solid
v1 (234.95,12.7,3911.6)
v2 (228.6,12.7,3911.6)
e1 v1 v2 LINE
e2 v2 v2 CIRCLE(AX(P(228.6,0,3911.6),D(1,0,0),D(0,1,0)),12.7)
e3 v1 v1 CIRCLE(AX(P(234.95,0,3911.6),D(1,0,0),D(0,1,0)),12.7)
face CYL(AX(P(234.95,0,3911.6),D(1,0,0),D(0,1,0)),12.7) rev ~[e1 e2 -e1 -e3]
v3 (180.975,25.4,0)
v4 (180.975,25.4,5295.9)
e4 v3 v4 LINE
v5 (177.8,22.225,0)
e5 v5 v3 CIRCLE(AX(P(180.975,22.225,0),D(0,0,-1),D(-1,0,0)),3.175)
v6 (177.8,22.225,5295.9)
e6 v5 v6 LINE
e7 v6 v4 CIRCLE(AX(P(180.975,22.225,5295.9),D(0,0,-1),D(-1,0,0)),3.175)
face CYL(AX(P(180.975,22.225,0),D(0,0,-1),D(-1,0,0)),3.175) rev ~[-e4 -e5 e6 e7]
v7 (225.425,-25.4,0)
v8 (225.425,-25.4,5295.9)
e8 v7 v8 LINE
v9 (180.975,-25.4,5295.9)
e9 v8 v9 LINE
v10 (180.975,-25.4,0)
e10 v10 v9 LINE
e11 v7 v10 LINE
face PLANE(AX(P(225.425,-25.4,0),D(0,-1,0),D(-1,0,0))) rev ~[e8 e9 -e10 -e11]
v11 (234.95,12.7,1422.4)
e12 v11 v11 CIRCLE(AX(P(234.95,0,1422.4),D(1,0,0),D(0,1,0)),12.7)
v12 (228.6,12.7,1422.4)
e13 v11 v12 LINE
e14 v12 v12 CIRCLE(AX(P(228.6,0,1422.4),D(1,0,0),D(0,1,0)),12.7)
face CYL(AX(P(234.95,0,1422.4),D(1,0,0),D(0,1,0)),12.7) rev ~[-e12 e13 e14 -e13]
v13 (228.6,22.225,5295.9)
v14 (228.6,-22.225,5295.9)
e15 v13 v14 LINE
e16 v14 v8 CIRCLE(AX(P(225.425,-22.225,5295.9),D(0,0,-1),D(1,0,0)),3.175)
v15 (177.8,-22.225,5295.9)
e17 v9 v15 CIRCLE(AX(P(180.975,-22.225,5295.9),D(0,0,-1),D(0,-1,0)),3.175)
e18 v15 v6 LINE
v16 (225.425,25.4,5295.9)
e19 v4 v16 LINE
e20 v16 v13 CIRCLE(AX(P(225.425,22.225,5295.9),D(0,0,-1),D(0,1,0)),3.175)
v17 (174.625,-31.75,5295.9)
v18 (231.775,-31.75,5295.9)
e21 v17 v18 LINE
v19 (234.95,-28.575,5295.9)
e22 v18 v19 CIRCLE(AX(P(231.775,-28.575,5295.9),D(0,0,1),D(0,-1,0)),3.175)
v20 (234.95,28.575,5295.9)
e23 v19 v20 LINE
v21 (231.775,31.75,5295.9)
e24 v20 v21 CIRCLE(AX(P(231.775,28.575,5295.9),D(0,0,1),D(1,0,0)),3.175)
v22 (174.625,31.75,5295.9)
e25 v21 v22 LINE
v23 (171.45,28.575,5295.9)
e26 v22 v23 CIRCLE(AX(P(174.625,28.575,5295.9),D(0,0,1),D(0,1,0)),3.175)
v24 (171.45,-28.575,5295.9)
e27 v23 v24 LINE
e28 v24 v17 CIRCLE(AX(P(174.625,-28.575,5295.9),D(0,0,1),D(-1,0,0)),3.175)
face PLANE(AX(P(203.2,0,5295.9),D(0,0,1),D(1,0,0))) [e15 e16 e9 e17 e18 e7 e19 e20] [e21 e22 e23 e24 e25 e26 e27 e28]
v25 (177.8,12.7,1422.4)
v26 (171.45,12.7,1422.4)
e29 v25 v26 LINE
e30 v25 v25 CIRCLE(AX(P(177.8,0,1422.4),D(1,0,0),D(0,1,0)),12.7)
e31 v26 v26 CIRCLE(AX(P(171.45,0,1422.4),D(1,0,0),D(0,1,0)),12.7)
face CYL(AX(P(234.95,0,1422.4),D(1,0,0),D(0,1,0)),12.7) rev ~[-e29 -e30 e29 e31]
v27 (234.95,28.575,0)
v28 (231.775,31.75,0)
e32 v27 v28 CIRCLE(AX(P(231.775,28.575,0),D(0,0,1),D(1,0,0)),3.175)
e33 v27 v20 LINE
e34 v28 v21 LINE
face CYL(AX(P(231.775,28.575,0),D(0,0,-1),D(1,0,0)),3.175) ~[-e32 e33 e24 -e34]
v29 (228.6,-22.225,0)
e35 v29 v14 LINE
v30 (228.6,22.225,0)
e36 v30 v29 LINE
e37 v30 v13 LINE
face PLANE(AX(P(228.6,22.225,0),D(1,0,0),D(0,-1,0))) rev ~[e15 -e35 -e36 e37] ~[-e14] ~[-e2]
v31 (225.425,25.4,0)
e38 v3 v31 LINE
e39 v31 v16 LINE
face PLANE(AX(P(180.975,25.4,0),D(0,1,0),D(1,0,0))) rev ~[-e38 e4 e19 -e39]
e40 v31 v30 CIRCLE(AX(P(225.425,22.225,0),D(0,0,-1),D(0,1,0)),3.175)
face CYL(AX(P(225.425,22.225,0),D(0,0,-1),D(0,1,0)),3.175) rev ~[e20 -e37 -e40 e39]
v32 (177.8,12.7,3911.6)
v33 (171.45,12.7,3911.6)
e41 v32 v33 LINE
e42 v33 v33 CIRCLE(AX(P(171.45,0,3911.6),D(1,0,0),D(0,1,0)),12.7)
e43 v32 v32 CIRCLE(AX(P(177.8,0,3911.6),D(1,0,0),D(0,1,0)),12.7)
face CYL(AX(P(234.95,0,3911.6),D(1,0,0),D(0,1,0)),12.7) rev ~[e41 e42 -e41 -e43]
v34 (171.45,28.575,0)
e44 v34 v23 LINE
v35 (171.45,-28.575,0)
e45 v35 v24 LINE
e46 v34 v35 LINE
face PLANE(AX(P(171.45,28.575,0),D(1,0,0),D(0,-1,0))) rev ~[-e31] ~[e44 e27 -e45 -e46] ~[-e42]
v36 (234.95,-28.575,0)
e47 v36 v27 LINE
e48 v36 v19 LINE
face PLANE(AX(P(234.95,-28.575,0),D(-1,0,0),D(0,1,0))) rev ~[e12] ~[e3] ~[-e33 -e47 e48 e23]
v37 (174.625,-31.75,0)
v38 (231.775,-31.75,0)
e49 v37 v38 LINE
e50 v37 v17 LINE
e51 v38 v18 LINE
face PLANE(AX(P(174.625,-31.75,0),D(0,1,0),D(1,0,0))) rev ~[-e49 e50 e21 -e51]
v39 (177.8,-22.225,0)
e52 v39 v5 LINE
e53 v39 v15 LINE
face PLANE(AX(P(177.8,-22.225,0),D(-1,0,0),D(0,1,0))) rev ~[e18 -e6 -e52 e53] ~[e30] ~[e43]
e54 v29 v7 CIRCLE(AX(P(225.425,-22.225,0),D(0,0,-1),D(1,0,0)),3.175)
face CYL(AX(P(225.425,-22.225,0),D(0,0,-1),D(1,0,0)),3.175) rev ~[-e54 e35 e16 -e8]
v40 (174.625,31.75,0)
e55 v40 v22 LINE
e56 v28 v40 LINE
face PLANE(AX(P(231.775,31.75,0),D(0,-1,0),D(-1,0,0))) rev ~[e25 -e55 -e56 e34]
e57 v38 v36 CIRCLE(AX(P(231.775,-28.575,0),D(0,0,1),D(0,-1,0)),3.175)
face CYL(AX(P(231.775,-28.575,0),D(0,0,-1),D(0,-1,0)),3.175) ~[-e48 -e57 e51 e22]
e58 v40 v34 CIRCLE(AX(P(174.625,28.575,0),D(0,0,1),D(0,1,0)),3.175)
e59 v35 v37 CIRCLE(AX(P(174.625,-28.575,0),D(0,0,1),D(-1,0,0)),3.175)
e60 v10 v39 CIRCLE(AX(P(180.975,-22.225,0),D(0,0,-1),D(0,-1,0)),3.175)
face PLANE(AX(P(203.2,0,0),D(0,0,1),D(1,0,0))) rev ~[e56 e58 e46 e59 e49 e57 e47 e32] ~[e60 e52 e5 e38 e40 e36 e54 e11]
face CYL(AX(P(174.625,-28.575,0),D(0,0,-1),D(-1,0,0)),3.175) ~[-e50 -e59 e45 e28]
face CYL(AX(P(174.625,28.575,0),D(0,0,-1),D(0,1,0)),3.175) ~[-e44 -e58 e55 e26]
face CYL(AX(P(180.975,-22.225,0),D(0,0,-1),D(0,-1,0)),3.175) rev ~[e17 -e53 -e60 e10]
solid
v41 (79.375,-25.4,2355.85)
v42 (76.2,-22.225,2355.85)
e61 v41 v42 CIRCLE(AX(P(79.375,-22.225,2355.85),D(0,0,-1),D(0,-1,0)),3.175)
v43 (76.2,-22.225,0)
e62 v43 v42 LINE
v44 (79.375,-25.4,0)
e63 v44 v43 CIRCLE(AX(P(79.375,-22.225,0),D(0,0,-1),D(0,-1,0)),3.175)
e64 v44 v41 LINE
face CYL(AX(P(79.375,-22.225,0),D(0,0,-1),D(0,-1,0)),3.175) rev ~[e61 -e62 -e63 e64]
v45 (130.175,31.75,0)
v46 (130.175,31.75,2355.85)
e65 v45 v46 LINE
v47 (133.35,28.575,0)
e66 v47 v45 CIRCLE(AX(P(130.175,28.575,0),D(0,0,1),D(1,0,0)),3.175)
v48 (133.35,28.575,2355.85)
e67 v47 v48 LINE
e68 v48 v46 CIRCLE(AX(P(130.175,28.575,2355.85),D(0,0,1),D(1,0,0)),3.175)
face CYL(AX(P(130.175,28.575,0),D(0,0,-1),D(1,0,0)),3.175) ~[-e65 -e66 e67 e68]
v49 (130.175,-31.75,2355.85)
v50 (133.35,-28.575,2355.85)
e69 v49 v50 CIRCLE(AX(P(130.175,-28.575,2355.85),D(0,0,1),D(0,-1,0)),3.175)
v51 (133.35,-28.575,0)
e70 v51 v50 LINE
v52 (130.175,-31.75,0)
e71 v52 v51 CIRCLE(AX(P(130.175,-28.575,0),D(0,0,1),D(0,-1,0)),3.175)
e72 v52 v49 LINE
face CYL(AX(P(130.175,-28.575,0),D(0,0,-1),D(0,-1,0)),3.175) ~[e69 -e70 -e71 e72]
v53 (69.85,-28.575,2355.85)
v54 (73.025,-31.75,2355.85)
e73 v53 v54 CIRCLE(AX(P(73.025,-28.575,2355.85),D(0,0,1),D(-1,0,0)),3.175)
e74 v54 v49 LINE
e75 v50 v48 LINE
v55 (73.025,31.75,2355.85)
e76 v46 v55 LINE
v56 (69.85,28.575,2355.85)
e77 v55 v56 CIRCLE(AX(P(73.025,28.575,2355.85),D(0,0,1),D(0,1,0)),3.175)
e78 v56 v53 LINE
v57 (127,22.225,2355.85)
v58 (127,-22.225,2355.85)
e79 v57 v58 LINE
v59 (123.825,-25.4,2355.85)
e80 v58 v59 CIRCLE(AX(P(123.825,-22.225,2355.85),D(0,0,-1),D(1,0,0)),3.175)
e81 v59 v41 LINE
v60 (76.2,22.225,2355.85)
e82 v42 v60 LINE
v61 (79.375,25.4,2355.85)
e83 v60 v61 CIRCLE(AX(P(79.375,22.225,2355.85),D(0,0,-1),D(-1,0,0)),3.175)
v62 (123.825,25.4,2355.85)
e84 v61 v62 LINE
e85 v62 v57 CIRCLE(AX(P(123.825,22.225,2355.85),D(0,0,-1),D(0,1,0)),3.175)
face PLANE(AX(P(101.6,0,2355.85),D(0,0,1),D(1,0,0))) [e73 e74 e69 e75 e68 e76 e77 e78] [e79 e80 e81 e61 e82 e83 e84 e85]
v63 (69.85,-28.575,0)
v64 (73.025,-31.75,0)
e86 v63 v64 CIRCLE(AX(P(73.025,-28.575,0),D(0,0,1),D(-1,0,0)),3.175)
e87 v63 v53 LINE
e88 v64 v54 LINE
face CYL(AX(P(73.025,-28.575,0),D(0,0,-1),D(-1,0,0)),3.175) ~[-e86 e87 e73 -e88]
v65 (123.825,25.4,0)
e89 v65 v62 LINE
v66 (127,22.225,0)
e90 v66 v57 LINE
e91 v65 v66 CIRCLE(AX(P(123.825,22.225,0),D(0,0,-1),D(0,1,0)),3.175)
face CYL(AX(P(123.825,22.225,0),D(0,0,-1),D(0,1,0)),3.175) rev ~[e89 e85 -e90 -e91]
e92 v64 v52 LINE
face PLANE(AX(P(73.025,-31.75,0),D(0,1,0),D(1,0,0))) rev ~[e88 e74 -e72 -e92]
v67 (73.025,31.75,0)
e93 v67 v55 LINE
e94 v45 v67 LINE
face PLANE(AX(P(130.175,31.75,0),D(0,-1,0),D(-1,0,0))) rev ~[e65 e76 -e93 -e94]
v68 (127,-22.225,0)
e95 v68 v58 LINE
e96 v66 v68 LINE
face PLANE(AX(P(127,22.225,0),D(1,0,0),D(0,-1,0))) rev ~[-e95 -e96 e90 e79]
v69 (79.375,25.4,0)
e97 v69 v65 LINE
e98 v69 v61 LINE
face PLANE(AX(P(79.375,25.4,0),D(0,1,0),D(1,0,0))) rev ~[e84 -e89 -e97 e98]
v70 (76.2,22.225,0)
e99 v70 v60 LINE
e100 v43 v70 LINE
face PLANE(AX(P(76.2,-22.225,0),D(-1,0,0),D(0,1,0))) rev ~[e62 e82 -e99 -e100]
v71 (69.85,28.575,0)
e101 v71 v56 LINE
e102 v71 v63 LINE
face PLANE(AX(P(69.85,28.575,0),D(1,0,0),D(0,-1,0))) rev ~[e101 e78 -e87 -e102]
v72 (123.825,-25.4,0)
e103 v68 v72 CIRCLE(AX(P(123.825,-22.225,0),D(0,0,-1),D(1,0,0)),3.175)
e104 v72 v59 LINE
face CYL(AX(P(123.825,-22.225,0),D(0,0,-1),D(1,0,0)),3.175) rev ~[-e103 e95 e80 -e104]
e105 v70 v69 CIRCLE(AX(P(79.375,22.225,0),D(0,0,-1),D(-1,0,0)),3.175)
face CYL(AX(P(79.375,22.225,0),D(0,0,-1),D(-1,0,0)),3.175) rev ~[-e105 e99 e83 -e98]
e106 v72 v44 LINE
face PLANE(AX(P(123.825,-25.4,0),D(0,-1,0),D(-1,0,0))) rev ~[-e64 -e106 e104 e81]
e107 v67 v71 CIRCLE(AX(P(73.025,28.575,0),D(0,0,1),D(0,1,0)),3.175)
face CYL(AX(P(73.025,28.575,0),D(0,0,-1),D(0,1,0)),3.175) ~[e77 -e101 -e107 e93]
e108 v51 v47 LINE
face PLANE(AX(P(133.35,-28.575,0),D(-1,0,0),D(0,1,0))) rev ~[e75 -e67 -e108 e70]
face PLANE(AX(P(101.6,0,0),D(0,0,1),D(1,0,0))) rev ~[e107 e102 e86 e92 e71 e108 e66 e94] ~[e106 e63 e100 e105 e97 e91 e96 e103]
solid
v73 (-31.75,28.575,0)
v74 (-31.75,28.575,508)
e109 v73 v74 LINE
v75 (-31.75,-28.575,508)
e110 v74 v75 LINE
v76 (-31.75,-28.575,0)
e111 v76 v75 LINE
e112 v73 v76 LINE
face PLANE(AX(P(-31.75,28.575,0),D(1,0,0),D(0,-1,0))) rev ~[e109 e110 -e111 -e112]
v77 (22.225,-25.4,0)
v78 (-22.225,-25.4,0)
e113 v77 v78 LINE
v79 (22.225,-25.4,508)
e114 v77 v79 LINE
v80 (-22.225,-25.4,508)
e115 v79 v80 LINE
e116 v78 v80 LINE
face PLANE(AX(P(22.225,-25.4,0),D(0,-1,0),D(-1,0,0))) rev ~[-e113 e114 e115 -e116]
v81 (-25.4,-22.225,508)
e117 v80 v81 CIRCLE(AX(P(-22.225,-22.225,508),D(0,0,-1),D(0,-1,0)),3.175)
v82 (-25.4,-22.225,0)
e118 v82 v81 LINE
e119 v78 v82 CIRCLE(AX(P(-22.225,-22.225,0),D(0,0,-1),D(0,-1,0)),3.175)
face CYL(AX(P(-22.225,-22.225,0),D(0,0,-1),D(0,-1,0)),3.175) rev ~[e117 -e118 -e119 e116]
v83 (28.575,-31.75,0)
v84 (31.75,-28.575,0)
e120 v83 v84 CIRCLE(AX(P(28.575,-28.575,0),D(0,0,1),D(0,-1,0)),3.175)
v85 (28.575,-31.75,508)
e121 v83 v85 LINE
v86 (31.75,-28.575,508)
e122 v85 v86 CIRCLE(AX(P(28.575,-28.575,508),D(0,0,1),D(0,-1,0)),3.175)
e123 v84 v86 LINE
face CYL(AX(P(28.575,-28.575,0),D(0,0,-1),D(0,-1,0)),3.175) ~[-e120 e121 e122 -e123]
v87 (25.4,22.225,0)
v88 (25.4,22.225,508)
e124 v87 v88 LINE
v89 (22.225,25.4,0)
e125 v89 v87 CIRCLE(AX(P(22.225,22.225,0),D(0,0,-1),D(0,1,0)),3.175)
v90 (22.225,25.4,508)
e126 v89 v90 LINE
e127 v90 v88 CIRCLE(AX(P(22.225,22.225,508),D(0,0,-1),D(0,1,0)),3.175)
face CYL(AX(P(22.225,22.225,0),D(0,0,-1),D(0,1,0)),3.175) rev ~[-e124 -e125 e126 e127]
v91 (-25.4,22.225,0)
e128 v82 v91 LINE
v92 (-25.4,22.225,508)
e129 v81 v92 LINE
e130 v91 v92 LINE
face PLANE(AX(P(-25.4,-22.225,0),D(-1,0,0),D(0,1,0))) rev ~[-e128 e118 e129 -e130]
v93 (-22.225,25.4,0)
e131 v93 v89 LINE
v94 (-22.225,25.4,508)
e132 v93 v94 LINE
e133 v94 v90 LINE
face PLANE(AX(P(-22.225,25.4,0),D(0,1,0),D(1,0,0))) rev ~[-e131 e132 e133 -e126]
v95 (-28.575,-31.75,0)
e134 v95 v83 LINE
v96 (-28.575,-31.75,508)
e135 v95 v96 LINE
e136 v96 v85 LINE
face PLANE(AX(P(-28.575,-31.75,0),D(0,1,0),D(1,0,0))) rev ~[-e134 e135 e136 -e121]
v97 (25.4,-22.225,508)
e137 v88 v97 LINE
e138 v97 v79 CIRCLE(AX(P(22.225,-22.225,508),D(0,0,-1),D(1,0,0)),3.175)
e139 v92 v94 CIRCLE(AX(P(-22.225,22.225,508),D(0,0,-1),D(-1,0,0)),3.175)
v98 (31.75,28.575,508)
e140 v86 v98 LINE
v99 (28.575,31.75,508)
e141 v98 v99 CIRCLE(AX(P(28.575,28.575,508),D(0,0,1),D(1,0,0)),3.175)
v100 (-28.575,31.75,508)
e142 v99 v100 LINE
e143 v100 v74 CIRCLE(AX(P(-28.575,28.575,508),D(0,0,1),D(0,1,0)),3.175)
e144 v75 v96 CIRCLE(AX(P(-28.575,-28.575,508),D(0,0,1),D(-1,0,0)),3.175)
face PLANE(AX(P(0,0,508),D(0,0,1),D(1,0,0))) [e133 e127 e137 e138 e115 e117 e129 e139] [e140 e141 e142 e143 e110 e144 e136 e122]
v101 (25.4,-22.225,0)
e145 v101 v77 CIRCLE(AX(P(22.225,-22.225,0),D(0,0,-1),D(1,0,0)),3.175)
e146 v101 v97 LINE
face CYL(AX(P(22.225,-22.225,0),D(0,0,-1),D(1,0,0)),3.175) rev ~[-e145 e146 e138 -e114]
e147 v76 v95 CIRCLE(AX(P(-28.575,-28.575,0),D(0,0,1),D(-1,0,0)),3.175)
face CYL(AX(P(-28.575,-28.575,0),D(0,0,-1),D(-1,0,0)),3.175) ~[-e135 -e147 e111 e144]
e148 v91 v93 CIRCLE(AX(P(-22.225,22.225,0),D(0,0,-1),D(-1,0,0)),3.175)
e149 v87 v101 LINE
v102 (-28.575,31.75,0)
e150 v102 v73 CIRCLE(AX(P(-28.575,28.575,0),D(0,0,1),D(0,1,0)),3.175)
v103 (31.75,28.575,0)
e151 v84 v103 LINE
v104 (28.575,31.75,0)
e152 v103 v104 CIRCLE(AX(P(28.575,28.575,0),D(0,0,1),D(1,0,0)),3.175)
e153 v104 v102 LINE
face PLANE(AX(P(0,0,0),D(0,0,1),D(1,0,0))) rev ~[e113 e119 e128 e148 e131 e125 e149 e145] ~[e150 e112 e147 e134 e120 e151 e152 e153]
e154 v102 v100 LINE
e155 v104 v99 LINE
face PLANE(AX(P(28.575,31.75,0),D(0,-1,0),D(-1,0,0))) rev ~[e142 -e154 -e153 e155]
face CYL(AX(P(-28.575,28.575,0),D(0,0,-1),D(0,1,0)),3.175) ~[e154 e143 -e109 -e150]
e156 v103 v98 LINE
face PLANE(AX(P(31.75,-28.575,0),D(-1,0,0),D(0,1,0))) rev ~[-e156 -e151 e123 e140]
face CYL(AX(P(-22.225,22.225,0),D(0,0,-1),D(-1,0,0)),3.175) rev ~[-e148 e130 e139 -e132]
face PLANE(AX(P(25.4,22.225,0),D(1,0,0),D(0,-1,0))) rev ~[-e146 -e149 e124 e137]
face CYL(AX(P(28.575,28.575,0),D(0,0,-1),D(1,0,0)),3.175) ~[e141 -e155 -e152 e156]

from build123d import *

# Parameters (mm, degrees)
F1_DEPTH = 508
F2_DEPTH = 2355.85
F3_DEPTH = 5295.9
F6_R     = 12.7
F7_DEPTH = 266.701


with BuildPart() as f1:
    # F0 (on Top) → F1 (new body)
    with BuildSketch(Plane.XY):
        with BuildLine():
            ThreePointArc((31.75, 28.575), (30.8200640303, 30.8200640303), (28.575, 31.75))
            Line((28.575, 31.75), (-28.575, 31.75))
            ThreePointArc((-28.575, 31.75), (-30.8200640303, 30.8200640303), (-31.75, 28.575))
            Line((-31.75, 28.575), (-31.75, -28.575))
            ThreePointArc((-31.75, -28.575), (-30.8200640303, -30.8200640303), (-28.575, -31.75))
            Line((-28.575, -31.75), (28.575, -31.75))
            ThreePointArc((28.575, -31.75), (30.8200640303, -30.8200640303), (31.75, -28.575))
            Line((31.75, -28.575), (31.75, 28.575))
        make_face()
        with BuildLine():
            Line((-22.225, 25.4), (22.225, 25.4))
            ThreePointArc((22.225, 25.4), (24.4700640303, 24.4700640303), (25.4, 22.225))
            Line((25.4, 22.225), (25.4, -22.225))
            ThreePointArc((25.4, -22.225), (24.4700640303, -24.4700640303), (22.225, -25.4))
            Line((22.225, -25.4), (-22.225, -25.4))
            ThreePointArc((-22.225, -25.4), (-24.4700640303, -24.4700640303), (-25.4, -22.225))
            Line((-25.4, -22.225), (-25.4, 22.225))
            ThreePointArc((-25.4, 22.225), (-24.4700640303, 24.4700640303), (-22.225, 25.4))
        make_face(mode=Mode.SUBTRACT)
    extrude(amount=F1_DEPTH)


with BuildPart() as f2:
    # F0 (on Top) → F2 (new body)
    with BuildSketch(Plane.XY):
        with BuildLine():
            Line((73.025, -31.75), (130.175, -31.75))
            ThreePointArc((130.175, -31.75), (132.4200640303, -30.8200640303), (133.35, -28.575))
            Line((133.35, -28.575), (133.35, 28.575))
            ThreePointArc((133.35, 28.575), (132.4200640303, 30.8200640303), (130.175, 31.75))
            Line((130.175, 31.75), (73.025, 31.75))
            ThreePointArc((73.025, 31.75), (70.7799359697, 30.8200640303), (69.85, 28.575))
            Line((69.85, 28.575), (69.85, -28.575))
            ThreePointArc((69.85, -28.575), (70.7799359697, -30.8200640303), (73.025, -31.75))
        make_face()
        with BuildLine():
            Line((79.375, 25.4), (123.825, 25.4))
            ThreePointArc((123.825, 25.4), (126.0700640303, 24.4700640303), (127, 22.225))
            Line((127, 22.225), (127, -22.225))
            ThreePointArc((127, -22.225), (126.0700640303, -24.4700640303), (123.825, -25.4))
            Line((123.825, -25.4), (79.375, -25.4))
            ThreePointArc((79.375, -25.4), (77.1299359697, -24.4700640303), (76.2, -22.225))
            Line((76.2, -22.225), (76.2, 22.225))
            ThreePointArc((76.2, 22.225), (77.1299359697, 24.4700640303), (79.375, 25.4))
        make_face(mode=Mode.SUBTRACT)
    extrude(amount=F2_DEPTH)


with BuildPart() as f3:
    # F0 (on Top) → F3 (new body)
    with BuildSketch(Plane.XY):
        with BuildLine():
            Line((174.625, -31.75), (231.775, -31.75))
            ThreePointArc((231.775, -31.75), (234.0200640303, -30.8200640303), (234.95, -28.575))
            Line((234.95, -28.575), (234.95, 28.575))
            ThreePointArc((234.95, 28.575), (234.0200640303, 30.8200640303), (231.775, 31.75))
            Line((231.775, 31.75), (174.625, 31.75))
            ThreePointArc((174.625, 31.75), (172.3799359697, 30.8200640303), (171.45, 28.575))
            Line((171.45, 28.575), (171.45, -28.575))
            ThreePointArc((171.45, -28.575), (172.3799359697, -30.8200640303), (174.625, -31.75))
        make_face()
        with BuildLine():
            Line((180.975, 25.4), (225.425, 25.4))
            ThreePointArc((225.425, 25.4), (227.6700640303, 24.4700640303), (228.6, 22.225))
            Line((228.6, 22.225), (228.6, -22.225))
            ThreePointArc((228.6, -22.225), (227.6700640303, -24.4700640303), (225.425, -25.4))
            Line((225.425, -25.4), (180.975, -25.4))
            ThreePointArc((180.975, -25.4), (178.7299359697, -24.4700640303), (177.8, -22.225))
            Line((177.8, -22.225), (177.8, 22.225))
            ThreePointArc((177.8, 22.225), (178.7299359697, 24.4700640303), (180.975, 25.4))
        make_face(mode=Mode.SUBTRACT)
    extrude(amount=F3_DEPTH)

    # F6 (on face) → F7 (cut, through all)
    with BuildSketch(Plane.YZ.offset(234.95)):
        with Locations((0, 3911.6)):
            Circle(F6_R)
        with Locations((0, 1422.4)):
            Circle(F6_R)
    extrude(amount=-F7_DEPTH, mode=Mode.SUBTRACT)


solid = Compound([f1.part, f2.part, f3.part])
